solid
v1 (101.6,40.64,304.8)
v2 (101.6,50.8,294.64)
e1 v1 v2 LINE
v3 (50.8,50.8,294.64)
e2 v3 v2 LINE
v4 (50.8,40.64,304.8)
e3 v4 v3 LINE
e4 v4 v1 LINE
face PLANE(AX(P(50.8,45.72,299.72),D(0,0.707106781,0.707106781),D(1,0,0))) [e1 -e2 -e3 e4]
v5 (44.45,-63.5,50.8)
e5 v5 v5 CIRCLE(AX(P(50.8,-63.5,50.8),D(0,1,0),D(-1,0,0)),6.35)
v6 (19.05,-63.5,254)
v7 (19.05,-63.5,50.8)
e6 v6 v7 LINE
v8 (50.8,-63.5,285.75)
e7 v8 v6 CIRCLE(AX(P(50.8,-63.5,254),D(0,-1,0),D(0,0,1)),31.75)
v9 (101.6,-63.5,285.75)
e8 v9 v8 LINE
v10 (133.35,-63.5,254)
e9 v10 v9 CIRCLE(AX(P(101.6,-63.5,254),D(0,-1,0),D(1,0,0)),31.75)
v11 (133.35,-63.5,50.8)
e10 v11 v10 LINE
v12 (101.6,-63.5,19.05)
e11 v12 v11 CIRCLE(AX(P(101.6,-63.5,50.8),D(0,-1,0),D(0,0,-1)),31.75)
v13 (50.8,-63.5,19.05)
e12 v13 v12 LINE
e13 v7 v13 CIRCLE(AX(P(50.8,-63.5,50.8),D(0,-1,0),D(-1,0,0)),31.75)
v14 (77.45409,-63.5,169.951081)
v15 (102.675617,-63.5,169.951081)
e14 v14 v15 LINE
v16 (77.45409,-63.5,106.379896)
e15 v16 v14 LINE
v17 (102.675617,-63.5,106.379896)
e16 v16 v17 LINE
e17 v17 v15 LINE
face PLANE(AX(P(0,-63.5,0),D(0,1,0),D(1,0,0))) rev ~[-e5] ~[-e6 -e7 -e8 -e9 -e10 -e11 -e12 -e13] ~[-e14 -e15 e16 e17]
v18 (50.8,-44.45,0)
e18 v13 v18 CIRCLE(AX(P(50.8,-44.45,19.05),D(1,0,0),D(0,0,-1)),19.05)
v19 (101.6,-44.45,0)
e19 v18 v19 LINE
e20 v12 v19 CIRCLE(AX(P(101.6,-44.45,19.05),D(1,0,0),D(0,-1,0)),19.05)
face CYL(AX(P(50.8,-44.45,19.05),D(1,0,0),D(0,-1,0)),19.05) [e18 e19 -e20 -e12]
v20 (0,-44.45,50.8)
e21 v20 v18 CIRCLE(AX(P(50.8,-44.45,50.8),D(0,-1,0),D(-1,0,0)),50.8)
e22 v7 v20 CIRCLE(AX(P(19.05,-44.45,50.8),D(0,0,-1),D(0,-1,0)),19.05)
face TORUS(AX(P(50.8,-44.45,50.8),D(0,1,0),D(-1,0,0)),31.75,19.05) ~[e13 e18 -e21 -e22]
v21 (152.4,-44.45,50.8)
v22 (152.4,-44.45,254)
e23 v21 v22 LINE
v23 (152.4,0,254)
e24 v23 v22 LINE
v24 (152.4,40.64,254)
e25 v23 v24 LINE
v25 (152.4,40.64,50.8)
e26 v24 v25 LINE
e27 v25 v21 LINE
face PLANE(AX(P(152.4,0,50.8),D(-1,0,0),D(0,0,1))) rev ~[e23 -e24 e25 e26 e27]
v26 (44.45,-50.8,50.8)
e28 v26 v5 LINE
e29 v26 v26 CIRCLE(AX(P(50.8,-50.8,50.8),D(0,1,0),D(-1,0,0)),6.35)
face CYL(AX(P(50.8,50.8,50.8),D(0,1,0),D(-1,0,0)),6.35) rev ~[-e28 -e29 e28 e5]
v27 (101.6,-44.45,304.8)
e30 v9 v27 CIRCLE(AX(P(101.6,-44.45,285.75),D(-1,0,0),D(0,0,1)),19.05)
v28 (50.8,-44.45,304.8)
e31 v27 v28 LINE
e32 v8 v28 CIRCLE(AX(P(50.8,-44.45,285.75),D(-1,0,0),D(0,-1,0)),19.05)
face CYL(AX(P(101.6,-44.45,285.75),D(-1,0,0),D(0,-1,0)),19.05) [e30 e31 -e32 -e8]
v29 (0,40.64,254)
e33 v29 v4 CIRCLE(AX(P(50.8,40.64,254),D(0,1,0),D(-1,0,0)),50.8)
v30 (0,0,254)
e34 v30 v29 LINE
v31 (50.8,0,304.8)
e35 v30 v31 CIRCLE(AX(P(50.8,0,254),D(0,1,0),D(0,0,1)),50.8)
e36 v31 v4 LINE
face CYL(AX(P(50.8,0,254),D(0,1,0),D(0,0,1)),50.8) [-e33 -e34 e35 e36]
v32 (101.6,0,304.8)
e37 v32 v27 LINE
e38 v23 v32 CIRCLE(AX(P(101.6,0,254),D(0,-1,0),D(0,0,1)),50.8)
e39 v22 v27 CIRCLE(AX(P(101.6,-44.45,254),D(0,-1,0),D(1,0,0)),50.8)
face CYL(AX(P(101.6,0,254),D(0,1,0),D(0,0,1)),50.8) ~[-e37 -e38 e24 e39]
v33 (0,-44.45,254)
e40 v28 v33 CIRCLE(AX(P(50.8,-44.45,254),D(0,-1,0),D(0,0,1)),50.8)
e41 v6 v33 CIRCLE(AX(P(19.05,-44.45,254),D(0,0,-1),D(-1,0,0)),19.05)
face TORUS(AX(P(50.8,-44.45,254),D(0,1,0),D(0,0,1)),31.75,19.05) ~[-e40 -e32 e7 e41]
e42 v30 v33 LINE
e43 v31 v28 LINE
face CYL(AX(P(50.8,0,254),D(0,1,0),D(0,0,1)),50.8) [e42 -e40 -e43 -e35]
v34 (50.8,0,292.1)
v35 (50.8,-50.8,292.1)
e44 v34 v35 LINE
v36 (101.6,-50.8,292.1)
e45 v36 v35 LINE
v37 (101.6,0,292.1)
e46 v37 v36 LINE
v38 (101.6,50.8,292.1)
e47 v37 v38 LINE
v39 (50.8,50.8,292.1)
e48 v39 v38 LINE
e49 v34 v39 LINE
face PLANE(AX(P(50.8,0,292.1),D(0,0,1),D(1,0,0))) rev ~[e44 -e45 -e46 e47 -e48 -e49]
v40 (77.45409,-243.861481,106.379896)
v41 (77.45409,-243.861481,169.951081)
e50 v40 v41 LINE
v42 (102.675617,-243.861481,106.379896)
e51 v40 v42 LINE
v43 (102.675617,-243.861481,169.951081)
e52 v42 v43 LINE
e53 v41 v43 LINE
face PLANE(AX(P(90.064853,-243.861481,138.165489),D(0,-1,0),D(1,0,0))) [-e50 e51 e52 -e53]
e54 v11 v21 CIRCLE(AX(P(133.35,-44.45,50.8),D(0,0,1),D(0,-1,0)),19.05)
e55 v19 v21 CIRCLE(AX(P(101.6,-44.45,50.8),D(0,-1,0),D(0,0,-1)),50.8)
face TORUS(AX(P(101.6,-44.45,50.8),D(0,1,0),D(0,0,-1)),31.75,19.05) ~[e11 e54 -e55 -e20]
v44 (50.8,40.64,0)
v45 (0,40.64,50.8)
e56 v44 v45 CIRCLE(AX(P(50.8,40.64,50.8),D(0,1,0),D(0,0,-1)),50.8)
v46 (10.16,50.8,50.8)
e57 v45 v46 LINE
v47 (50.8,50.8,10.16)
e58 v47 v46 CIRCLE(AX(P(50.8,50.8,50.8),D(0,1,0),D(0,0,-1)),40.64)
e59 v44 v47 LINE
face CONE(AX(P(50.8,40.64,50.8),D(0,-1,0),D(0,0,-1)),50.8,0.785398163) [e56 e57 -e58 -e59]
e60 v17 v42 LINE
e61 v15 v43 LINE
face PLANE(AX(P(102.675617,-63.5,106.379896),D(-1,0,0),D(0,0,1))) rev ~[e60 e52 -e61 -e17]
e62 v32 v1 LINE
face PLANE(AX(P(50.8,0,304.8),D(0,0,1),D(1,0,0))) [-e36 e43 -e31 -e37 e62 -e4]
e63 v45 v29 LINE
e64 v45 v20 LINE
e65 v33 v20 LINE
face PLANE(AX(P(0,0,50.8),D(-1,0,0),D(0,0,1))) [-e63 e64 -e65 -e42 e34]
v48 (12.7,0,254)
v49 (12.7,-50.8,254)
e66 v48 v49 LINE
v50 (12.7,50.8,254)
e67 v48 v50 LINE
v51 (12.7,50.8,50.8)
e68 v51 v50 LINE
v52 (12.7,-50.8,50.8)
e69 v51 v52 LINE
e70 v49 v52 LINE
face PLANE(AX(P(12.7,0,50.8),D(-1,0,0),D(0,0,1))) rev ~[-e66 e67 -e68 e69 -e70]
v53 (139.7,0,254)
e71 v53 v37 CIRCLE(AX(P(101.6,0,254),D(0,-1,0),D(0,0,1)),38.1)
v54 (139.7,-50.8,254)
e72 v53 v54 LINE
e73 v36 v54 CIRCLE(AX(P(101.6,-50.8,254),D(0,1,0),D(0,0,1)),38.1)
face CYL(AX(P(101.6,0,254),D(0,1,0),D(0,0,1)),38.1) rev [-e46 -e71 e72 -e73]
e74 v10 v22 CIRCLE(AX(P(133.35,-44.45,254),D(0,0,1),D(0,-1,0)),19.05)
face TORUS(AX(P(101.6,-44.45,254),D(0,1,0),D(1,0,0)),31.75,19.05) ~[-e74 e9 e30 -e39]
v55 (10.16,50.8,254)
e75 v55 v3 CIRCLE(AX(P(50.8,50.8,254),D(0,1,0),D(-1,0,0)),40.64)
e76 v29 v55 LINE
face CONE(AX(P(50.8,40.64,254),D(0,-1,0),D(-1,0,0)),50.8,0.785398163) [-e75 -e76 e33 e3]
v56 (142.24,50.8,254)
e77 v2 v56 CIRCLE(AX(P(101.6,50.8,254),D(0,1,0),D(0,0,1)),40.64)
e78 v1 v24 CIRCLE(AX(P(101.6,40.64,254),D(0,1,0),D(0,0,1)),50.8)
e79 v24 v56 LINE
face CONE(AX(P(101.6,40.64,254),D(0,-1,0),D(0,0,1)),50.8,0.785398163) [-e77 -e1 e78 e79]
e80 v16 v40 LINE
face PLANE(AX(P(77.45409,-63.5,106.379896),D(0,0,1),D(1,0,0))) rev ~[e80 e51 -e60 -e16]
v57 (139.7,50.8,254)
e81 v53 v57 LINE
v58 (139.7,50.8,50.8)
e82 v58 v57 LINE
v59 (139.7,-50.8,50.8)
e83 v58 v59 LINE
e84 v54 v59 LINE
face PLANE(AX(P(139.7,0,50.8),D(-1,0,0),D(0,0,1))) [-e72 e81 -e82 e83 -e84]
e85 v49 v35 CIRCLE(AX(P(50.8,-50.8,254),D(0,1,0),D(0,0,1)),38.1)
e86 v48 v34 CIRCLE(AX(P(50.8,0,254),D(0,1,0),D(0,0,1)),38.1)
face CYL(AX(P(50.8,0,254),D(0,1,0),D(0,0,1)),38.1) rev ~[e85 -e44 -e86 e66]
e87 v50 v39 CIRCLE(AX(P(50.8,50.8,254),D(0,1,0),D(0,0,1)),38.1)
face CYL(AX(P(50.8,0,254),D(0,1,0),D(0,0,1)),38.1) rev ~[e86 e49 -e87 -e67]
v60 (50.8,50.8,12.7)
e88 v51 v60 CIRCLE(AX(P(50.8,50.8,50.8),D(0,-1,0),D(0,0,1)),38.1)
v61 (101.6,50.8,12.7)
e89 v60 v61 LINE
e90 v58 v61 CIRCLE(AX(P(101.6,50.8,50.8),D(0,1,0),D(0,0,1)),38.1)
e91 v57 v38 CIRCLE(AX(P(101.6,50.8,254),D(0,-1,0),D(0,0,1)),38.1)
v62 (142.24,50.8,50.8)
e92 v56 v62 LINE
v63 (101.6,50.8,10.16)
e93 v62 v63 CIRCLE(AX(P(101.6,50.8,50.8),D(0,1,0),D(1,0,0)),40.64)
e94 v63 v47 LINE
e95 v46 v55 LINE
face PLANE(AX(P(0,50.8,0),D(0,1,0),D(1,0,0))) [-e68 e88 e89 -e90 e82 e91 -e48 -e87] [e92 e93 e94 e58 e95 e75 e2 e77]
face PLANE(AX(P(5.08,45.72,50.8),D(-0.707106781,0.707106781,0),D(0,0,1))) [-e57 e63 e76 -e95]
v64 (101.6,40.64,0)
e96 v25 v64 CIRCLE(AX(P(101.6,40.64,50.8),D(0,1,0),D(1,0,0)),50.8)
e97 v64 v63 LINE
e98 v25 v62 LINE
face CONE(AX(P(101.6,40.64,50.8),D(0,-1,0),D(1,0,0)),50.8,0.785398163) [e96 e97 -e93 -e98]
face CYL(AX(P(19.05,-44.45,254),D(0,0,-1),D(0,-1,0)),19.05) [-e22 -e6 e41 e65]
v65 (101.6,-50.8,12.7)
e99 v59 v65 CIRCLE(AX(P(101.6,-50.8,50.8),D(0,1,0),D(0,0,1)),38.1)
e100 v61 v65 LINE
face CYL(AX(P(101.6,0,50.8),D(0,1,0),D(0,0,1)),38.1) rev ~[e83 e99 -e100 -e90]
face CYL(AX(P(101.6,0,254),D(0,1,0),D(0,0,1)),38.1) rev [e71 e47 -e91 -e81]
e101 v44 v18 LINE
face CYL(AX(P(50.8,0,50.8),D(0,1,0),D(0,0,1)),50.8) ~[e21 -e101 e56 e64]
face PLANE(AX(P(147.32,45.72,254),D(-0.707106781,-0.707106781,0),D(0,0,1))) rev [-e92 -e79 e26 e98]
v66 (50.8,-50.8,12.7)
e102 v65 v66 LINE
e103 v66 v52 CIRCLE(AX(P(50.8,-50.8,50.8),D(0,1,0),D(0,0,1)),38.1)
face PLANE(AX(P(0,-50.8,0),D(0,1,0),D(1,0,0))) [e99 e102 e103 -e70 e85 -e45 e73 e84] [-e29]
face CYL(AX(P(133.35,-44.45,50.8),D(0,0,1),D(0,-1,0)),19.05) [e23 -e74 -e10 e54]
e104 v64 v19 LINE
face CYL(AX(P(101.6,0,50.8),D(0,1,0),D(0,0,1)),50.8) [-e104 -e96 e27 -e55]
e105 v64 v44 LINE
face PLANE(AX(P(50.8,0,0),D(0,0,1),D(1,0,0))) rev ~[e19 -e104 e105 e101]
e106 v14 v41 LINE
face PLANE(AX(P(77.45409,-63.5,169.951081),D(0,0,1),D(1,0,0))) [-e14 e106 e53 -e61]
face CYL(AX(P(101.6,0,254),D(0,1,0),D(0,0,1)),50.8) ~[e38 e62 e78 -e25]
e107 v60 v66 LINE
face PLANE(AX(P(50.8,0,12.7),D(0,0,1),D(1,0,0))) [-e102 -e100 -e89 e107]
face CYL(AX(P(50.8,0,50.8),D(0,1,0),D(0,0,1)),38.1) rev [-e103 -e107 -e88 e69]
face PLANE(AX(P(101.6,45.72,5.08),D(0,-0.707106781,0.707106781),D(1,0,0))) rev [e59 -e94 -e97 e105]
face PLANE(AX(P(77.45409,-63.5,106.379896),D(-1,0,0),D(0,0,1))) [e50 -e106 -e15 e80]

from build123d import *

# Parameters (mm, degrees)
F0_W      = 152.4
F0_H      = 50.8
F1_DEPTH  = 304.8
F2_R      = 50.8
F3_DEPTH  = 63.5
F4_T      = -12.7
F9_SIZE   = 10.16
F10_R     = 6.35
F5_DEPTH  = 114.301
F7_R      = 19.05
F6_W      = 25.2215266228
F6_H      = 63.5711848736
F11_DEPTH = 180.3614813834


# Not quite as in the source:
# - a feature names something its author has since deleted; it is built from what else it names


with BuildPart() as f1:
    # F0 (on Top) → F1 (new body)
    with BuildSketch(Plane.XY):
        with Locations((76.2, 25.4)):
            Rectangle(F0_W, F0_H)
    extrude(amount=F1_DEPTH)

    # F2
    f2_edges = [f1.edges().sort_by_distance(p)[0] for p in [
        (152.4, 25.4, 304.8),
        (152.4, 25.4, 0),
        (0, 25.4, 304.8),
        (0, 25.4, 0),
    ]]
    fillet(f2_edges, radius=F2_R)

    # F3 (add): a face of the model
    f3_faces = [f1.faces().sort_by_distance(p)[0] for p in [
        (76.2, 0, 152.4),
    ]]
    extrude(f3_faces, amount=F3_DEPTH)

    # F4
    f4_openings = [f1.faces().sort_by_distance(p)[0] for p in [
        (76.2, 50.8, 152.4),
    ]]
    offset(amount=F4_T, openings=f4_openings)

    # F9
    f9_edges = [f1.edges().sort_by_distance(p)[0] for p in [
        (0, 50.8, 152.4),
        (14.878976, 50.8, 14.878976),
        (137.521024, 50.8, 14.878976),
        (152.4, 50.8, 152.4),
        (137.521024, 50.8, 289.921024),
        (76.2, 50.8, 304.8),
        (76.2, 50.8, 0),
        (14.878976, 50.8, 289.921024),
    ]]
    chamfer(f9_edges, length=F9_SIZE)

    # F10 (on face) → F5 (cut, through all)
    with BuildSketch(Plane(origin=(0, 50.8, 0), x_dir=(-1, 0, 0), z_dir=(0, 1, 0))):
        with Locations((-50.8, 50.8)):
            Circle(F10_R)
    extrude(amount=-F5_DEPTH, mode=Mode.SUBTRACT)

    # F7
    f7_edges = [f1.edges().sort_by_distance(p)[0] for p in [
        (152.4, -63.5, 152.4),
        (0, -63.5, 152.4),
        (14.878976, -63.5, 289.921024),
        (14.878976, -63.5, 14.878976),
        (76.2, -63.5, 0),
        (76.2, -63.5, 304.8),
        (137.521024, -63.5, 14.878976),
        (137.521024, -63.5, 289.921024),
    ]]
    fillet(f7_edges, radius=F7_R)

    # F6 (on face) → F11 (join)
    with BuildSketch(Plane.XZ.offset(63.5)):
        with Locations((90.0648534298, 138.1654888391)):
            Rectangle(F6_W, F6_H)
    extrude(amount=F11_DEPTH)


solid = f1.part
